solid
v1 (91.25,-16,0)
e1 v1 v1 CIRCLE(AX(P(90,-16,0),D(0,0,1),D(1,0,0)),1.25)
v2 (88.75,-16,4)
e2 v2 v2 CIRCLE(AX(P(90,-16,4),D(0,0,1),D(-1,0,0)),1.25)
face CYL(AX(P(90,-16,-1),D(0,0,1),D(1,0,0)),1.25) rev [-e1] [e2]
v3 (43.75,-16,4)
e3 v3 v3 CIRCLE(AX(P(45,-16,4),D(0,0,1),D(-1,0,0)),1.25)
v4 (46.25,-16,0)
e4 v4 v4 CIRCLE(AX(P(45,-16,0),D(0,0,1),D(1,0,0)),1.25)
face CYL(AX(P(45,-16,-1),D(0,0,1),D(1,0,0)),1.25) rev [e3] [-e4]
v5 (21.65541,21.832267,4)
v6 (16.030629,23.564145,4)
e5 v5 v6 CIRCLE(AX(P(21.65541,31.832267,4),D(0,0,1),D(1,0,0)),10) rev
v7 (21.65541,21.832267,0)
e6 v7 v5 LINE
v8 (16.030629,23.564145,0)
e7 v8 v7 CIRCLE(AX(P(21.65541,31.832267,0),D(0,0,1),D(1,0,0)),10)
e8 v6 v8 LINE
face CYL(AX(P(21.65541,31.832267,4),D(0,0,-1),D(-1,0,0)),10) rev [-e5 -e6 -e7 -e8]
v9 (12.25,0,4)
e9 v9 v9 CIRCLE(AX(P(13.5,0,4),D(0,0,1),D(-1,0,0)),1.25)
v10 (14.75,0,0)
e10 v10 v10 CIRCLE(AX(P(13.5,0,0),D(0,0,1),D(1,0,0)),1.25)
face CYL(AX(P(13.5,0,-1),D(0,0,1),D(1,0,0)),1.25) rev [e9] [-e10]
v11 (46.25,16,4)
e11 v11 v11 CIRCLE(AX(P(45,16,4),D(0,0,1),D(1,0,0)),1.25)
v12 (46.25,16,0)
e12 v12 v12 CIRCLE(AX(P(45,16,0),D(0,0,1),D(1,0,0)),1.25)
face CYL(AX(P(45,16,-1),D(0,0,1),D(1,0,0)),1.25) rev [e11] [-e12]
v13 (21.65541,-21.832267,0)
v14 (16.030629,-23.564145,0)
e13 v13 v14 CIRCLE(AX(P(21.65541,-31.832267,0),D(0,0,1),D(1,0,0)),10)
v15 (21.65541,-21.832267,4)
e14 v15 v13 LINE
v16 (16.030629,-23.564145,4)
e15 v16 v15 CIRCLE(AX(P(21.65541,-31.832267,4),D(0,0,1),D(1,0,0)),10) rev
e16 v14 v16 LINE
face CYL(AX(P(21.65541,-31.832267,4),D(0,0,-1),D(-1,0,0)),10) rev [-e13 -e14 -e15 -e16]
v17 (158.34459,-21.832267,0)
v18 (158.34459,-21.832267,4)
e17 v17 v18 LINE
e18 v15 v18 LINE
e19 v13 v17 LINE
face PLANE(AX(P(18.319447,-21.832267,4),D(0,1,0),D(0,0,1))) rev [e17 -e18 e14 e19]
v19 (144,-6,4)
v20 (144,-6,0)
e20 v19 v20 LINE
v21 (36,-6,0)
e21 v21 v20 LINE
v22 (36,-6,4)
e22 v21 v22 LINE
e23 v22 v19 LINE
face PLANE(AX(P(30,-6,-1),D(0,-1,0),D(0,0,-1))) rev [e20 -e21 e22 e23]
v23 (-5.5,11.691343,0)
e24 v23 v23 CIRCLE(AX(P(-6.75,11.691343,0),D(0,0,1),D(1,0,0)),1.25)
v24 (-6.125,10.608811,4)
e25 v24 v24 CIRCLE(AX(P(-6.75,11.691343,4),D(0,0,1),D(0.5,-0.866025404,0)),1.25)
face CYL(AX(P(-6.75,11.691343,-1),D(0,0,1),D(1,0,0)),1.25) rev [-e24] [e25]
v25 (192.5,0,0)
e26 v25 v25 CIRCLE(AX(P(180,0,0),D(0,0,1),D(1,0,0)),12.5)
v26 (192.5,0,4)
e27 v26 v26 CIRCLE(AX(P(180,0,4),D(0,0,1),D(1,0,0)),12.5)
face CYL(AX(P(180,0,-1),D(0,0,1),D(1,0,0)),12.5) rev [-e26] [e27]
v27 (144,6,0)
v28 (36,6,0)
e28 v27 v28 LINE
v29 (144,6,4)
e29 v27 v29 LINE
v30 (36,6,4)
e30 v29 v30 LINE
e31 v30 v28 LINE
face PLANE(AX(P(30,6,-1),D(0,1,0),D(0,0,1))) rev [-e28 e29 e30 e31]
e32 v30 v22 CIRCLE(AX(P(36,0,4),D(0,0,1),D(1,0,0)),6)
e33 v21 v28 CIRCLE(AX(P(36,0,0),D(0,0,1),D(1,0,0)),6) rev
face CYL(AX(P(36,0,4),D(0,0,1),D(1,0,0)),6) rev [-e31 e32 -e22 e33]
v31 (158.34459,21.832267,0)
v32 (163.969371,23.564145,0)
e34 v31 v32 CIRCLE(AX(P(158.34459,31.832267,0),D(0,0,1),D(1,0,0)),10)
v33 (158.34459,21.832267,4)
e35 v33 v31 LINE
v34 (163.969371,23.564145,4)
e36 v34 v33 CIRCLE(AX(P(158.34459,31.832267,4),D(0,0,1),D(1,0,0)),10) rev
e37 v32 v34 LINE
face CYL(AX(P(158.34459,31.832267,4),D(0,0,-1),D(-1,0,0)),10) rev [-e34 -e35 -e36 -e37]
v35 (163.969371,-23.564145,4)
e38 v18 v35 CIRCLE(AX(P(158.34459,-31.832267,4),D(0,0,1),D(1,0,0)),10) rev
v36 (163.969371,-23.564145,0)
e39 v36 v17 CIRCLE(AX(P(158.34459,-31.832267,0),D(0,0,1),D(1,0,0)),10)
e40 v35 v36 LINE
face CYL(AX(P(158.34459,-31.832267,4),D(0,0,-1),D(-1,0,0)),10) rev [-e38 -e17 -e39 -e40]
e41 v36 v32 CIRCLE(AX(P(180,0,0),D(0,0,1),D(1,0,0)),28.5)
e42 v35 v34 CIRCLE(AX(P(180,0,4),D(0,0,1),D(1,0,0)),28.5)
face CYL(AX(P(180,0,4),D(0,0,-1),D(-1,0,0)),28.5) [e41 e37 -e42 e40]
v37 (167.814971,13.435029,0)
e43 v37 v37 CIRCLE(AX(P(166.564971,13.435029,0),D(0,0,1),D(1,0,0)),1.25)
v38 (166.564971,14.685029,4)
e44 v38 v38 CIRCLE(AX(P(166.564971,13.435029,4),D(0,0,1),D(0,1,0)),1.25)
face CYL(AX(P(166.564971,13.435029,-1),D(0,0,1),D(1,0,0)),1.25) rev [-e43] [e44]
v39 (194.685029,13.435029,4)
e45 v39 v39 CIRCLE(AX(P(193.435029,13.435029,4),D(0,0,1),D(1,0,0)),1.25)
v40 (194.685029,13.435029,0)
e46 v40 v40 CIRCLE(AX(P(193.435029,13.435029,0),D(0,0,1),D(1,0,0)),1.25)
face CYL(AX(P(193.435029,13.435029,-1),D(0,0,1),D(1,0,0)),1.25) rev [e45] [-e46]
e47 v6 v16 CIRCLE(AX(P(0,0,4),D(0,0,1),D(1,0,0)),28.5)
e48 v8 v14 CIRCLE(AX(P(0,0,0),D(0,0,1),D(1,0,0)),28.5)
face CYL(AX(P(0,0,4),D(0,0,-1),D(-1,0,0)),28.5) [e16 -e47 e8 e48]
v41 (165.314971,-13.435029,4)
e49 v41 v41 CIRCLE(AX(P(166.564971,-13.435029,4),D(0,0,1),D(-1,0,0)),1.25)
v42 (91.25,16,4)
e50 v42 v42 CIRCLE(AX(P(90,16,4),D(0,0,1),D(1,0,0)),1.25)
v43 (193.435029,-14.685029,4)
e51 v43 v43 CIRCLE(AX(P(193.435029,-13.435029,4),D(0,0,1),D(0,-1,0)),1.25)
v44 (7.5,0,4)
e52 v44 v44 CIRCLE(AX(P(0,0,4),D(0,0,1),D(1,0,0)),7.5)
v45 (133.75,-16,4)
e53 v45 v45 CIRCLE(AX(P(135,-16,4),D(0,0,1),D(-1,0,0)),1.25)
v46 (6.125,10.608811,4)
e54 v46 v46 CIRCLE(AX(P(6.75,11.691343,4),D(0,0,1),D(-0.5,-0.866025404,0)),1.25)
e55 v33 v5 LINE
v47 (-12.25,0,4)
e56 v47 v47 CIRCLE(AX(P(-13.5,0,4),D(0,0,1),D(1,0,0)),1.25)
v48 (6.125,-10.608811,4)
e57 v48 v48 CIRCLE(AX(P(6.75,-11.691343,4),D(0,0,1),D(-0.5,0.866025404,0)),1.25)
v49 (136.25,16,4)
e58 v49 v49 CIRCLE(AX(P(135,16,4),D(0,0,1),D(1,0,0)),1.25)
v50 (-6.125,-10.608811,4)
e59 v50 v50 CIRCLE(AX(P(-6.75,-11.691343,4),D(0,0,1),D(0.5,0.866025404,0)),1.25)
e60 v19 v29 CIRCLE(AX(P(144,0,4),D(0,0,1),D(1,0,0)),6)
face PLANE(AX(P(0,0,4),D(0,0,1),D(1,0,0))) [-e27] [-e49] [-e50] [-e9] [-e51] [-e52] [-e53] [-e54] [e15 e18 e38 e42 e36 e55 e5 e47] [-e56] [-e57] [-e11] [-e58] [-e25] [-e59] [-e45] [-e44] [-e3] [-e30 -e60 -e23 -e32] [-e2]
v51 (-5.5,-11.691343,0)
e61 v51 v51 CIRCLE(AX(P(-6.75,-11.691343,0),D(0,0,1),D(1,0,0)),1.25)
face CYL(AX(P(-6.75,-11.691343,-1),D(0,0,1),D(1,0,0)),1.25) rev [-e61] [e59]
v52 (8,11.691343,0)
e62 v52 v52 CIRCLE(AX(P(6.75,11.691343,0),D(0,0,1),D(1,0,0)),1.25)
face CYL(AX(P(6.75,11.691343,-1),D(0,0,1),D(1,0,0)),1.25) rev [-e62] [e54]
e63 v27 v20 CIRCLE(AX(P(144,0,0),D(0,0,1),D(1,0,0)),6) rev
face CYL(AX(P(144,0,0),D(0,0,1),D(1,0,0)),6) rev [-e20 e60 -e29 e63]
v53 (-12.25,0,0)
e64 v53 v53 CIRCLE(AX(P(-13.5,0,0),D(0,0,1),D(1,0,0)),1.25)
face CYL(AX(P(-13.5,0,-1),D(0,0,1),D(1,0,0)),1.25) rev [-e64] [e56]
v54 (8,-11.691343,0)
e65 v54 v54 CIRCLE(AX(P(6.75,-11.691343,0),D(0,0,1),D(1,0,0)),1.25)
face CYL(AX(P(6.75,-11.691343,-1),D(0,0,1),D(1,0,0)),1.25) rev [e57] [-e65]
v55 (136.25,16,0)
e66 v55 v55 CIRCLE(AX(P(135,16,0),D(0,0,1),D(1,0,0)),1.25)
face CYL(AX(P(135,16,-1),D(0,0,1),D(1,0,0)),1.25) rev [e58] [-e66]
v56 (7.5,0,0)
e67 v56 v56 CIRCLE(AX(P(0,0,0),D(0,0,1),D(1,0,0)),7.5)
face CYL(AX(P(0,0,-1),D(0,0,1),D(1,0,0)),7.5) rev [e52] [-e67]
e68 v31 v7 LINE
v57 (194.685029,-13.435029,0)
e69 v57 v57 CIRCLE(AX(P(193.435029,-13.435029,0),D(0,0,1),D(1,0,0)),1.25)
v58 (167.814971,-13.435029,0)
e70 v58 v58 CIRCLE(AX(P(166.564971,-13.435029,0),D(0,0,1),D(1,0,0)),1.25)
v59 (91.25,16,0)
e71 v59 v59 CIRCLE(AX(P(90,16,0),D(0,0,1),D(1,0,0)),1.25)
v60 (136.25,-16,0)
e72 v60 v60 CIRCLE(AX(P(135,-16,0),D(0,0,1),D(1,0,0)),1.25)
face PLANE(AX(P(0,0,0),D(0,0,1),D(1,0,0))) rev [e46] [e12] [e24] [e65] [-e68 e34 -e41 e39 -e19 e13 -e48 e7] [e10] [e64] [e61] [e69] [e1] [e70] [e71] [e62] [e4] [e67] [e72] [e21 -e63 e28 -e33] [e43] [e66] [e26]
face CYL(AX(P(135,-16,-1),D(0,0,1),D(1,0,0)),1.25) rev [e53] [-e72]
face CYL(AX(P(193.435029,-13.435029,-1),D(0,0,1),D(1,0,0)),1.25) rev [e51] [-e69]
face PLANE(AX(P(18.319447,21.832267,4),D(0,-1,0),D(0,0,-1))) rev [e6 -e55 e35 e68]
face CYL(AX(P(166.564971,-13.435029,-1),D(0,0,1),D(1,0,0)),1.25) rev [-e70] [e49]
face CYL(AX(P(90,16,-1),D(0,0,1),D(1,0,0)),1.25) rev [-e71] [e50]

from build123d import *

# Parameters (mm, degrees)
EXTRUDE_1_DEPTH          = 4
FILLET_1_R               = 10
SKETCH_2_R               = 7.5
SKETCH_2_R_2             = 1.25
CUT_EXTRUDE_1_DEPTH      = 5
PATTERN_CIRCULAR_1_COUNT = 6
SKETCH_3_R               = 12.5
SKETCH_3_R_2             = 1.25
CUT_EXTRUDE_2_DEPTH      = 5
PATTERN_CIRCULAR_2_COUNT = 4
SKETCH_4_W               = 120
SKETCH_4_H               = 12
CUT_EXTRUDE_3_DEPTH      = 5
FILLET_2_R               = 6
FILLET_3_R               = 6
SKETCH_5_R               = 1.25
CUT_EXTRUDE_5_DEPTH      = 5
PATTERN_LINEAR_2_COUNT   = 3
PATTERN_LINEAR_2_PITCH   = 45


with BuildPart() as part:
    # 草图1 → 凸台-拉伸1 (new body)
    with BuildSketch(Plane.XY):
        with BuildLine():
            Line((18.319446876, 21.832266629), (161.680553124, 21.832266629))
            ThreePointArc((161.680553124, 21.832266629), (208.5, 0), (161.680553124, -21.832266629))
            Line((161.680553124, -21.832266629), (18.319446876, -21.832266629))
            ThreePointArc((18.319446876, -21.832266629), (-28.5, 0), (18.319446876, 21.832266629))
        make_face()
    extrude(amount=EXTRUDE_1_DEPTH)

    # 圆角1
    fillet_1_edges = [part.edges().sort_by_distance(p)[0] for p in [
        (18.319446876, 21.832266629, 2),
        (161.680553124, 21.832266629, 2),
        (161.680553124, -21.832266629, 2),
        (18.319446876, -21.832266629, 2),
    ]]
    fillet(fillet_1_edges, radius=FILLET_1_R)

    # 草图2 → 切除-拉伸1 (cut)
    with BuildSketch(Plane.XY.offset(4)):
        Circle(SKETCH_2_R)
        with Locations((-13.5, 0)):
            Circle(SKETCH_2_R_2)
    cut_extrude_1 = extrude(amount=-CUT_EXTRUDE_1_DEPTH, mode=Mode.SUBTRACT)

    # 阵列(圆周)1: 切除-拉伸1 ×6 about axis
    pattern_circular_1_axis = Axis((0, 0, 0), (0, 0, 1))
    for i in range(1, PATTERN_CIRCULAR_1_COUNT):
        add(cut_extrude_1.rotate(pattern_circular_1_axis, i * 360 / PATTERN_CIRCULAR_1_COUNT), mode=Mode.SUBTRACT)

    # 草图3 → 切除-拉伸2 (cut)
    with BuildSketch(Plane.XY.offset(4)):
        with Locations((180, 0)):
            Circle(SKETCH_3_R)
        with Locations((193.435028843, 13.435028843)):
            Circle(SKETCH_3_R_2)
    cut_extrude_2 = extrude(amount=-CUT_EXTRUDE_2_DEPTH, mode=Mode.SUBTRACT)

    # 阵列(圆周)2: 切除-拉伸2 ×4 about axis
    pattern_circular_2_axis = Axis((180, 0, 0), (0, 0, 1))
    for i in range(1, PATTERN_CIRCULAR_2_COUNT):
        add(cut_extrude_2.rotate(pattern_circular_2_axis, i * 360 / PATTERN_CIRCULAR_2_COUNT), mode=Mode.SUBTRACT)

    # 草图4 → 切除-拉伸3 (cut)
    with BuildSketch(Plane.XY.offset(4)):
        with Locations((90, 0)):
            Rectangle(SKETCH_4_W, SKETCH_4_H)
    extrude(amount=-CUT_EXTRUDE_3_DEPTH, mode=Mode.SUBTRACT)

    # 圆角2
    fillet_2_edges = [part.edges().sort_by_distance(p)[0] for p in [
        (30, 6, 2),
        (30, -6, 2),
    ]]
    fillet(fillet_2_edges, radius=FILLET_2_R - 0.0001)  # a hair under: the kernel refuses the full size

    # 圆角3
    fillet_3_edges = [part.edges().sort_by_distance(p)[0] for p in [
        (150, 6, 2),
        (150, -6, 2),
    ]]
    fillet(fillet_3_edges, radius=FILLET_3_R - 0.0001)  # a hair under: the kernel refuses the full size

    # 草图5 → 切除-拉伸5 (cut)
    with BuildSketch(Plane.XY.offset(4)):
        with Locations((45, 16)):
            Circle(SKETCH_5_R)
        with Locations((45, -16)):
            Circle(SKETCH_5_R)
    cut_extrude_5 = extrude(amount=-CUT_EXTRUDE_5_DEPTH, mode=Mode.SUBTRACT)

    # 阵列(线性)2: 切除-拉伸5 ×3
    with Locations(*[(i * PATTERN_LINEAR_2_PITCH, 0, 0) for i in range(1, PATTERN_LINEAR_2_COUNT)]):
        add(cut_extrude_5, mode=Mode.SUBTRACT)


solid = part.part
